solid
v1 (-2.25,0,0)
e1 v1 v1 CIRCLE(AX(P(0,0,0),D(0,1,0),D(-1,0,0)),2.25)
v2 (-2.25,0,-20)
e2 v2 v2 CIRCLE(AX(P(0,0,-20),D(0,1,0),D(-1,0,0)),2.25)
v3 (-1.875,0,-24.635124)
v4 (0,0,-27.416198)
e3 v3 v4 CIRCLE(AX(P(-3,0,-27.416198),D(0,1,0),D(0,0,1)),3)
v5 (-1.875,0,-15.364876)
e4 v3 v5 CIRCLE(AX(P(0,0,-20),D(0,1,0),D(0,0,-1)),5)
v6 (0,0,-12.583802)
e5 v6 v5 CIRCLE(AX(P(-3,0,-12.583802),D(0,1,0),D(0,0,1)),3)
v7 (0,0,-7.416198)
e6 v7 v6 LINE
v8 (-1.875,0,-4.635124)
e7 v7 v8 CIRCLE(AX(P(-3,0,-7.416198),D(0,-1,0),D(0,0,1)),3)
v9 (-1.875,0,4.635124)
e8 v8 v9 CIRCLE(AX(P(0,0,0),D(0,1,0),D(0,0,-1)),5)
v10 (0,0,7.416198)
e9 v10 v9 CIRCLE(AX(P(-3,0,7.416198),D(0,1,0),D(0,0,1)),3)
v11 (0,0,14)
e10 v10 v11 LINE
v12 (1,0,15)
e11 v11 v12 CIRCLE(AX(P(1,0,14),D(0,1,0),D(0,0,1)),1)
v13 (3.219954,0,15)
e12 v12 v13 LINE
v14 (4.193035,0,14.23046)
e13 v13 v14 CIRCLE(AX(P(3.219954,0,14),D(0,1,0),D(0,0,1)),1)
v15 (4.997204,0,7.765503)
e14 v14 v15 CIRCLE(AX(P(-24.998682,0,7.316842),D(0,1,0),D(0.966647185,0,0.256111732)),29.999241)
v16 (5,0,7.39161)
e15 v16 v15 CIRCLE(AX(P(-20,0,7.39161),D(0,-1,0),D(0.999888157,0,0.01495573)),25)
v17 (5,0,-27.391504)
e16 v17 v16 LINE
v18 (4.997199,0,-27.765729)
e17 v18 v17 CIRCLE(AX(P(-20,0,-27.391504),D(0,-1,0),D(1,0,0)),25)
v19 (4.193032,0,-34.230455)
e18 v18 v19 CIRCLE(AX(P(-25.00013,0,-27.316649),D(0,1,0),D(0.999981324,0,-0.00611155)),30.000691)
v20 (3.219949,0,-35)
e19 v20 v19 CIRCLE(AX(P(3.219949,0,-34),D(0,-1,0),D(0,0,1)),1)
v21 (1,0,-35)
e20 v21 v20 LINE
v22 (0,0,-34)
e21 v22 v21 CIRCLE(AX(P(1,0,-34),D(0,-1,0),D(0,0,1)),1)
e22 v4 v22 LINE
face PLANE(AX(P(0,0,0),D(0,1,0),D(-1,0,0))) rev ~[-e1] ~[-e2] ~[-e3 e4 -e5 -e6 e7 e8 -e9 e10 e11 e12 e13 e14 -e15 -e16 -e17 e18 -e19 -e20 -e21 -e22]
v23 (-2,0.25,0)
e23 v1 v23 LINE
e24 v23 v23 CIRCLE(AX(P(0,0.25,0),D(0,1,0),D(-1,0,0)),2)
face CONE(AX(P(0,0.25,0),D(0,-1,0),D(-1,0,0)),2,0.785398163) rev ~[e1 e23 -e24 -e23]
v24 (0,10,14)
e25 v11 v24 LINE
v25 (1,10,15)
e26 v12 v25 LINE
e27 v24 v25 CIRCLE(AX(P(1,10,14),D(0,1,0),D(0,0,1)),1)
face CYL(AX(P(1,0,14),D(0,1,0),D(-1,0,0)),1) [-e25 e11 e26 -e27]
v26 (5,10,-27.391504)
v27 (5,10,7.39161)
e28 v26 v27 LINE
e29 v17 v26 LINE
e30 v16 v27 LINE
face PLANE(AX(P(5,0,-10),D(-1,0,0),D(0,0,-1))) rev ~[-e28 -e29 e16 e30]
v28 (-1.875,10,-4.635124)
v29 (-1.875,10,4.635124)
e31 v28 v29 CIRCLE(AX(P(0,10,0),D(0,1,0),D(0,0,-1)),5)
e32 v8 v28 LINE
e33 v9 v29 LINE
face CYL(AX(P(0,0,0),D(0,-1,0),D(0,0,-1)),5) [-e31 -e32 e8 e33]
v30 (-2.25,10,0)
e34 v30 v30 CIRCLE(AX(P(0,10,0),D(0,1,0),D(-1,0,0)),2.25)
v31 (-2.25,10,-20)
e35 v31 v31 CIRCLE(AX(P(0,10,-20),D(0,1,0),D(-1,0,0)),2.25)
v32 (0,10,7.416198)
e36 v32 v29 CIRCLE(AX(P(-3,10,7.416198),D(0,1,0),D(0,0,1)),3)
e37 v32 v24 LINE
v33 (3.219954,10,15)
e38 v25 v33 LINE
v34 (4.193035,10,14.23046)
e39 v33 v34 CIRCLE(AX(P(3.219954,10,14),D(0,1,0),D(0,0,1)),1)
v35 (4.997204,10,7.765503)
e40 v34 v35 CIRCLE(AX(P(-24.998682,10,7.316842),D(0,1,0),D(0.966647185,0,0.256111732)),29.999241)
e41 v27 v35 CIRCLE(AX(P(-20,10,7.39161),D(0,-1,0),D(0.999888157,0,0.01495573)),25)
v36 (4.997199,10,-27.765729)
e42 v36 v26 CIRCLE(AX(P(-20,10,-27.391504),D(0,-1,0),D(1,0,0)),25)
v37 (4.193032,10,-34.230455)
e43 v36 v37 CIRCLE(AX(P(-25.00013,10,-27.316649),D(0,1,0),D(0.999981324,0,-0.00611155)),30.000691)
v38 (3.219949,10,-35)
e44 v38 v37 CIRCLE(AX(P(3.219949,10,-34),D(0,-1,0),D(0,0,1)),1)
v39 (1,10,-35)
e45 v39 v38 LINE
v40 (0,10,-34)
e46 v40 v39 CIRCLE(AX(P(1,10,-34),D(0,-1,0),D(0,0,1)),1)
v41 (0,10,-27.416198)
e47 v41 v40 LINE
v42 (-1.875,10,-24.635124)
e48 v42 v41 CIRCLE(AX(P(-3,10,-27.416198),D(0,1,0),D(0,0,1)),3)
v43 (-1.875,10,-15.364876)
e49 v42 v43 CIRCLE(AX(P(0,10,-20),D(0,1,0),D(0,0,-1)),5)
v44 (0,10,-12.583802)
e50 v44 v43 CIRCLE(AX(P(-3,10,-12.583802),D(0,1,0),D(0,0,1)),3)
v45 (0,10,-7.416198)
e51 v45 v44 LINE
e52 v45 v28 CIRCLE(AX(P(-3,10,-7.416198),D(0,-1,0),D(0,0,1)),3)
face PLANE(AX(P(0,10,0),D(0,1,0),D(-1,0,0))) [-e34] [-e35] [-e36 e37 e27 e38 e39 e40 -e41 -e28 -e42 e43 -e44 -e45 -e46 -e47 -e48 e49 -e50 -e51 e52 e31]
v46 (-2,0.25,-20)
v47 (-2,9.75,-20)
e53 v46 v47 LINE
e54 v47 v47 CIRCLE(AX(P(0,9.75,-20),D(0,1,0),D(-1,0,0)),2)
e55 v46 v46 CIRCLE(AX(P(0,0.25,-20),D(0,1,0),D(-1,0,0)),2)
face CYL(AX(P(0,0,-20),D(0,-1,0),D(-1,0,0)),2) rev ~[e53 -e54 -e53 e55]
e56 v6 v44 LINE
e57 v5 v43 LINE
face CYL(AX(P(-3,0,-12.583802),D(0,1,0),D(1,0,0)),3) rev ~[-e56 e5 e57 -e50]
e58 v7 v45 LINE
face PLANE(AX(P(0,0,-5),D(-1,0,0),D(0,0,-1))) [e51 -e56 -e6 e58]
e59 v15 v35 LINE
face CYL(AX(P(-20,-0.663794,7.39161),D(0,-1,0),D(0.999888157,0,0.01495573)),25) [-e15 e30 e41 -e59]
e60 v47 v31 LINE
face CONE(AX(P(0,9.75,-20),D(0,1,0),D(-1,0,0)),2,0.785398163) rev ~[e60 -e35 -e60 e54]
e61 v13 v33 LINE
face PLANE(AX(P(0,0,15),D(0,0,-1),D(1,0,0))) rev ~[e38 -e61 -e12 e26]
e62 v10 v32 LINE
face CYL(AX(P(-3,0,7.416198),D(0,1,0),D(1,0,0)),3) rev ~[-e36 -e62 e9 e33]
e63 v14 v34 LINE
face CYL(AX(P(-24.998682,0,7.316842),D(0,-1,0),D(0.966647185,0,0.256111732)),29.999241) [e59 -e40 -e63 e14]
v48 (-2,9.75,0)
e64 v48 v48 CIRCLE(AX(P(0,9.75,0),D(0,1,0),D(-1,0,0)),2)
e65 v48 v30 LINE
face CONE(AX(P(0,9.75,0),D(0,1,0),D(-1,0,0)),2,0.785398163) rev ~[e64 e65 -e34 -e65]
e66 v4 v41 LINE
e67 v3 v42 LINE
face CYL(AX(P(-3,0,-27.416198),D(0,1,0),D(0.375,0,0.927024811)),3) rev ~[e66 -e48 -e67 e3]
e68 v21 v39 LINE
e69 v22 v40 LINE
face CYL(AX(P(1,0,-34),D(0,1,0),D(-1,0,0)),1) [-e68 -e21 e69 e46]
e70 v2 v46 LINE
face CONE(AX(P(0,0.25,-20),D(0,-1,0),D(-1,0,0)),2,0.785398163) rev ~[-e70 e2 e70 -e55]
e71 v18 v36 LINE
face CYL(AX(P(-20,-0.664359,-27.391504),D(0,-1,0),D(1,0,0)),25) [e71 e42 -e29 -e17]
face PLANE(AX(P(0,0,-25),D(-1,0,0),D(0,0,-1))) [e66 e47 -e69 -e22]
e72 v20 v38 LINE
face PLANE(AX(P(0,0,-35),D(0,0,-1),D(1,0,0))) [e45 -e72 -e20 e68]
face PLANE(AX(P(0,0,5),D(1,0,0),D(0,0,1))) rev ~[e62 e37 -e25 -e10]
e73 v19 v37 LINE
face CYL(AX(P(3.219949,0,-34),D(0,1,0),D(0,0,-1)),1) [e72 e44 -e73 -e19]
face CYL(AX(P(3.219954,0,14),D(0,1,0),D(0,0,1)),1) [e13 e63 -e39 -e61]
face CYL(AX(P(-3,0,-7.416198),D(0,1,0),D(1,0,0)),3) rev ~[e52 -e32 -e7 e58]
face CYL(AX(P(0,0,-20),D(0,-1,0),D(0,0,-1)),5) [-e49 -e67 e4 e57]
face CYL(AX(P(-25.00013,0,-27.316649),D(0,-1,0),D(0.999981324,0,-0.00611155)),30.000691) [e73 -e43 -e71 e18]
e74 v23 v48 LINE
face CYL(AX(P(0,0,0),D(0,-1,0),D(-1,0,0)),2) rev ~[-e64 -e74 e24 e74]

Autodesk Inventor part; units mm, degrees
ref_plane "YZ Plane" through (0, 0, 0) normal (1, 0, 0) x (0, 1, 0)
ref_plane "XZ Plane" through (0, 0, 0) normal (0, 1, 0) x (-1, 0, 0)
ref_plane "XY Plane" through (0, 0, 0) normal (0, 0, 1) x (1, 0, 0)
sketch "Sketch1" plane through (0, 0, 0) normal (0, 1, 0) x (-1, 0, 0)
  circle A0 centre (0, 0) radius 2
  line L0 (0, 0) -> (0, -20) construction
  circle A1 centre (0, -20) radius 2
  arc A2 (0, -5) -> (0, 5) centre (0, 0) ccw
  arc A3 (0, -25) -> (0, -15) centre (0, -20) ccw
  line L1 (0, -5) -> (0, -15)
  line L2 (0, -10) -> (-5, -10) construction
  line L3 (-5, -10) -> (-5, -35) construction
  line L4 (-5, -10) -> (-5, 15) construction
  line L5 (0, 5) -> (0, 15)
  line L6 (0, 15) -> (-4, 15)
  line L7 (0, -25) -> (0, -35)
  line L8 (0, -35) -> (-4, -35)
  line L9 (-5, -10) -> (-5, 7.5)
  line L10 (-5, -10) -> (-5, -27.5)
  arc A4 (-4, 15) -> (-5, 7.5) centre (24.9994, 7.3167) ccw
  arc A5 (-5, -27.5) -> (-4, -35) centre (24.9994, -27.3167) ccw
  dimension "d0" = 4
  dimension "d1" = 20
  dimension "d2" = 4
  dimension "d3" = 10
  dimension "d4" = 10
  dimension "d5" = 5
  dimension "d6" = 25
  dimension "d7" = 25
  dimension "d8" = 10
  dimension "d9" = 4
  dimension "d10" = 10
  dimension "d11" = 4
  dimension "d12" = 17.5
  dimension "d13" = 17.5
  dimension "d14" = 30
  dimension "d15" = 30
extrude "Extrusion1" add sketch "Sketch1" along normal blind 10
fillet "Fillet1" radius 3 4 edges at (0, 5, 5) (0, 5, -5) (0, 5, -15) (0, 5, -25)
fillet "Fillet2" radius 1 4 edges at (0, 5, 15) (4, 5, 15) (0, 5, -35) (4, 5, -35)
fillet "Fillet3" radius 25 2 edges at (5, 5, 7.5) (5, 5, -27.5)
chamfer "Chamfer1" distance 0.25 angle 45 4 edges at (2, 10, -20) (2, 10, 0) (2, 0, 0) (2, 0, -20)
properties part number "Battery_Slide" material "Nylon 6/6"
